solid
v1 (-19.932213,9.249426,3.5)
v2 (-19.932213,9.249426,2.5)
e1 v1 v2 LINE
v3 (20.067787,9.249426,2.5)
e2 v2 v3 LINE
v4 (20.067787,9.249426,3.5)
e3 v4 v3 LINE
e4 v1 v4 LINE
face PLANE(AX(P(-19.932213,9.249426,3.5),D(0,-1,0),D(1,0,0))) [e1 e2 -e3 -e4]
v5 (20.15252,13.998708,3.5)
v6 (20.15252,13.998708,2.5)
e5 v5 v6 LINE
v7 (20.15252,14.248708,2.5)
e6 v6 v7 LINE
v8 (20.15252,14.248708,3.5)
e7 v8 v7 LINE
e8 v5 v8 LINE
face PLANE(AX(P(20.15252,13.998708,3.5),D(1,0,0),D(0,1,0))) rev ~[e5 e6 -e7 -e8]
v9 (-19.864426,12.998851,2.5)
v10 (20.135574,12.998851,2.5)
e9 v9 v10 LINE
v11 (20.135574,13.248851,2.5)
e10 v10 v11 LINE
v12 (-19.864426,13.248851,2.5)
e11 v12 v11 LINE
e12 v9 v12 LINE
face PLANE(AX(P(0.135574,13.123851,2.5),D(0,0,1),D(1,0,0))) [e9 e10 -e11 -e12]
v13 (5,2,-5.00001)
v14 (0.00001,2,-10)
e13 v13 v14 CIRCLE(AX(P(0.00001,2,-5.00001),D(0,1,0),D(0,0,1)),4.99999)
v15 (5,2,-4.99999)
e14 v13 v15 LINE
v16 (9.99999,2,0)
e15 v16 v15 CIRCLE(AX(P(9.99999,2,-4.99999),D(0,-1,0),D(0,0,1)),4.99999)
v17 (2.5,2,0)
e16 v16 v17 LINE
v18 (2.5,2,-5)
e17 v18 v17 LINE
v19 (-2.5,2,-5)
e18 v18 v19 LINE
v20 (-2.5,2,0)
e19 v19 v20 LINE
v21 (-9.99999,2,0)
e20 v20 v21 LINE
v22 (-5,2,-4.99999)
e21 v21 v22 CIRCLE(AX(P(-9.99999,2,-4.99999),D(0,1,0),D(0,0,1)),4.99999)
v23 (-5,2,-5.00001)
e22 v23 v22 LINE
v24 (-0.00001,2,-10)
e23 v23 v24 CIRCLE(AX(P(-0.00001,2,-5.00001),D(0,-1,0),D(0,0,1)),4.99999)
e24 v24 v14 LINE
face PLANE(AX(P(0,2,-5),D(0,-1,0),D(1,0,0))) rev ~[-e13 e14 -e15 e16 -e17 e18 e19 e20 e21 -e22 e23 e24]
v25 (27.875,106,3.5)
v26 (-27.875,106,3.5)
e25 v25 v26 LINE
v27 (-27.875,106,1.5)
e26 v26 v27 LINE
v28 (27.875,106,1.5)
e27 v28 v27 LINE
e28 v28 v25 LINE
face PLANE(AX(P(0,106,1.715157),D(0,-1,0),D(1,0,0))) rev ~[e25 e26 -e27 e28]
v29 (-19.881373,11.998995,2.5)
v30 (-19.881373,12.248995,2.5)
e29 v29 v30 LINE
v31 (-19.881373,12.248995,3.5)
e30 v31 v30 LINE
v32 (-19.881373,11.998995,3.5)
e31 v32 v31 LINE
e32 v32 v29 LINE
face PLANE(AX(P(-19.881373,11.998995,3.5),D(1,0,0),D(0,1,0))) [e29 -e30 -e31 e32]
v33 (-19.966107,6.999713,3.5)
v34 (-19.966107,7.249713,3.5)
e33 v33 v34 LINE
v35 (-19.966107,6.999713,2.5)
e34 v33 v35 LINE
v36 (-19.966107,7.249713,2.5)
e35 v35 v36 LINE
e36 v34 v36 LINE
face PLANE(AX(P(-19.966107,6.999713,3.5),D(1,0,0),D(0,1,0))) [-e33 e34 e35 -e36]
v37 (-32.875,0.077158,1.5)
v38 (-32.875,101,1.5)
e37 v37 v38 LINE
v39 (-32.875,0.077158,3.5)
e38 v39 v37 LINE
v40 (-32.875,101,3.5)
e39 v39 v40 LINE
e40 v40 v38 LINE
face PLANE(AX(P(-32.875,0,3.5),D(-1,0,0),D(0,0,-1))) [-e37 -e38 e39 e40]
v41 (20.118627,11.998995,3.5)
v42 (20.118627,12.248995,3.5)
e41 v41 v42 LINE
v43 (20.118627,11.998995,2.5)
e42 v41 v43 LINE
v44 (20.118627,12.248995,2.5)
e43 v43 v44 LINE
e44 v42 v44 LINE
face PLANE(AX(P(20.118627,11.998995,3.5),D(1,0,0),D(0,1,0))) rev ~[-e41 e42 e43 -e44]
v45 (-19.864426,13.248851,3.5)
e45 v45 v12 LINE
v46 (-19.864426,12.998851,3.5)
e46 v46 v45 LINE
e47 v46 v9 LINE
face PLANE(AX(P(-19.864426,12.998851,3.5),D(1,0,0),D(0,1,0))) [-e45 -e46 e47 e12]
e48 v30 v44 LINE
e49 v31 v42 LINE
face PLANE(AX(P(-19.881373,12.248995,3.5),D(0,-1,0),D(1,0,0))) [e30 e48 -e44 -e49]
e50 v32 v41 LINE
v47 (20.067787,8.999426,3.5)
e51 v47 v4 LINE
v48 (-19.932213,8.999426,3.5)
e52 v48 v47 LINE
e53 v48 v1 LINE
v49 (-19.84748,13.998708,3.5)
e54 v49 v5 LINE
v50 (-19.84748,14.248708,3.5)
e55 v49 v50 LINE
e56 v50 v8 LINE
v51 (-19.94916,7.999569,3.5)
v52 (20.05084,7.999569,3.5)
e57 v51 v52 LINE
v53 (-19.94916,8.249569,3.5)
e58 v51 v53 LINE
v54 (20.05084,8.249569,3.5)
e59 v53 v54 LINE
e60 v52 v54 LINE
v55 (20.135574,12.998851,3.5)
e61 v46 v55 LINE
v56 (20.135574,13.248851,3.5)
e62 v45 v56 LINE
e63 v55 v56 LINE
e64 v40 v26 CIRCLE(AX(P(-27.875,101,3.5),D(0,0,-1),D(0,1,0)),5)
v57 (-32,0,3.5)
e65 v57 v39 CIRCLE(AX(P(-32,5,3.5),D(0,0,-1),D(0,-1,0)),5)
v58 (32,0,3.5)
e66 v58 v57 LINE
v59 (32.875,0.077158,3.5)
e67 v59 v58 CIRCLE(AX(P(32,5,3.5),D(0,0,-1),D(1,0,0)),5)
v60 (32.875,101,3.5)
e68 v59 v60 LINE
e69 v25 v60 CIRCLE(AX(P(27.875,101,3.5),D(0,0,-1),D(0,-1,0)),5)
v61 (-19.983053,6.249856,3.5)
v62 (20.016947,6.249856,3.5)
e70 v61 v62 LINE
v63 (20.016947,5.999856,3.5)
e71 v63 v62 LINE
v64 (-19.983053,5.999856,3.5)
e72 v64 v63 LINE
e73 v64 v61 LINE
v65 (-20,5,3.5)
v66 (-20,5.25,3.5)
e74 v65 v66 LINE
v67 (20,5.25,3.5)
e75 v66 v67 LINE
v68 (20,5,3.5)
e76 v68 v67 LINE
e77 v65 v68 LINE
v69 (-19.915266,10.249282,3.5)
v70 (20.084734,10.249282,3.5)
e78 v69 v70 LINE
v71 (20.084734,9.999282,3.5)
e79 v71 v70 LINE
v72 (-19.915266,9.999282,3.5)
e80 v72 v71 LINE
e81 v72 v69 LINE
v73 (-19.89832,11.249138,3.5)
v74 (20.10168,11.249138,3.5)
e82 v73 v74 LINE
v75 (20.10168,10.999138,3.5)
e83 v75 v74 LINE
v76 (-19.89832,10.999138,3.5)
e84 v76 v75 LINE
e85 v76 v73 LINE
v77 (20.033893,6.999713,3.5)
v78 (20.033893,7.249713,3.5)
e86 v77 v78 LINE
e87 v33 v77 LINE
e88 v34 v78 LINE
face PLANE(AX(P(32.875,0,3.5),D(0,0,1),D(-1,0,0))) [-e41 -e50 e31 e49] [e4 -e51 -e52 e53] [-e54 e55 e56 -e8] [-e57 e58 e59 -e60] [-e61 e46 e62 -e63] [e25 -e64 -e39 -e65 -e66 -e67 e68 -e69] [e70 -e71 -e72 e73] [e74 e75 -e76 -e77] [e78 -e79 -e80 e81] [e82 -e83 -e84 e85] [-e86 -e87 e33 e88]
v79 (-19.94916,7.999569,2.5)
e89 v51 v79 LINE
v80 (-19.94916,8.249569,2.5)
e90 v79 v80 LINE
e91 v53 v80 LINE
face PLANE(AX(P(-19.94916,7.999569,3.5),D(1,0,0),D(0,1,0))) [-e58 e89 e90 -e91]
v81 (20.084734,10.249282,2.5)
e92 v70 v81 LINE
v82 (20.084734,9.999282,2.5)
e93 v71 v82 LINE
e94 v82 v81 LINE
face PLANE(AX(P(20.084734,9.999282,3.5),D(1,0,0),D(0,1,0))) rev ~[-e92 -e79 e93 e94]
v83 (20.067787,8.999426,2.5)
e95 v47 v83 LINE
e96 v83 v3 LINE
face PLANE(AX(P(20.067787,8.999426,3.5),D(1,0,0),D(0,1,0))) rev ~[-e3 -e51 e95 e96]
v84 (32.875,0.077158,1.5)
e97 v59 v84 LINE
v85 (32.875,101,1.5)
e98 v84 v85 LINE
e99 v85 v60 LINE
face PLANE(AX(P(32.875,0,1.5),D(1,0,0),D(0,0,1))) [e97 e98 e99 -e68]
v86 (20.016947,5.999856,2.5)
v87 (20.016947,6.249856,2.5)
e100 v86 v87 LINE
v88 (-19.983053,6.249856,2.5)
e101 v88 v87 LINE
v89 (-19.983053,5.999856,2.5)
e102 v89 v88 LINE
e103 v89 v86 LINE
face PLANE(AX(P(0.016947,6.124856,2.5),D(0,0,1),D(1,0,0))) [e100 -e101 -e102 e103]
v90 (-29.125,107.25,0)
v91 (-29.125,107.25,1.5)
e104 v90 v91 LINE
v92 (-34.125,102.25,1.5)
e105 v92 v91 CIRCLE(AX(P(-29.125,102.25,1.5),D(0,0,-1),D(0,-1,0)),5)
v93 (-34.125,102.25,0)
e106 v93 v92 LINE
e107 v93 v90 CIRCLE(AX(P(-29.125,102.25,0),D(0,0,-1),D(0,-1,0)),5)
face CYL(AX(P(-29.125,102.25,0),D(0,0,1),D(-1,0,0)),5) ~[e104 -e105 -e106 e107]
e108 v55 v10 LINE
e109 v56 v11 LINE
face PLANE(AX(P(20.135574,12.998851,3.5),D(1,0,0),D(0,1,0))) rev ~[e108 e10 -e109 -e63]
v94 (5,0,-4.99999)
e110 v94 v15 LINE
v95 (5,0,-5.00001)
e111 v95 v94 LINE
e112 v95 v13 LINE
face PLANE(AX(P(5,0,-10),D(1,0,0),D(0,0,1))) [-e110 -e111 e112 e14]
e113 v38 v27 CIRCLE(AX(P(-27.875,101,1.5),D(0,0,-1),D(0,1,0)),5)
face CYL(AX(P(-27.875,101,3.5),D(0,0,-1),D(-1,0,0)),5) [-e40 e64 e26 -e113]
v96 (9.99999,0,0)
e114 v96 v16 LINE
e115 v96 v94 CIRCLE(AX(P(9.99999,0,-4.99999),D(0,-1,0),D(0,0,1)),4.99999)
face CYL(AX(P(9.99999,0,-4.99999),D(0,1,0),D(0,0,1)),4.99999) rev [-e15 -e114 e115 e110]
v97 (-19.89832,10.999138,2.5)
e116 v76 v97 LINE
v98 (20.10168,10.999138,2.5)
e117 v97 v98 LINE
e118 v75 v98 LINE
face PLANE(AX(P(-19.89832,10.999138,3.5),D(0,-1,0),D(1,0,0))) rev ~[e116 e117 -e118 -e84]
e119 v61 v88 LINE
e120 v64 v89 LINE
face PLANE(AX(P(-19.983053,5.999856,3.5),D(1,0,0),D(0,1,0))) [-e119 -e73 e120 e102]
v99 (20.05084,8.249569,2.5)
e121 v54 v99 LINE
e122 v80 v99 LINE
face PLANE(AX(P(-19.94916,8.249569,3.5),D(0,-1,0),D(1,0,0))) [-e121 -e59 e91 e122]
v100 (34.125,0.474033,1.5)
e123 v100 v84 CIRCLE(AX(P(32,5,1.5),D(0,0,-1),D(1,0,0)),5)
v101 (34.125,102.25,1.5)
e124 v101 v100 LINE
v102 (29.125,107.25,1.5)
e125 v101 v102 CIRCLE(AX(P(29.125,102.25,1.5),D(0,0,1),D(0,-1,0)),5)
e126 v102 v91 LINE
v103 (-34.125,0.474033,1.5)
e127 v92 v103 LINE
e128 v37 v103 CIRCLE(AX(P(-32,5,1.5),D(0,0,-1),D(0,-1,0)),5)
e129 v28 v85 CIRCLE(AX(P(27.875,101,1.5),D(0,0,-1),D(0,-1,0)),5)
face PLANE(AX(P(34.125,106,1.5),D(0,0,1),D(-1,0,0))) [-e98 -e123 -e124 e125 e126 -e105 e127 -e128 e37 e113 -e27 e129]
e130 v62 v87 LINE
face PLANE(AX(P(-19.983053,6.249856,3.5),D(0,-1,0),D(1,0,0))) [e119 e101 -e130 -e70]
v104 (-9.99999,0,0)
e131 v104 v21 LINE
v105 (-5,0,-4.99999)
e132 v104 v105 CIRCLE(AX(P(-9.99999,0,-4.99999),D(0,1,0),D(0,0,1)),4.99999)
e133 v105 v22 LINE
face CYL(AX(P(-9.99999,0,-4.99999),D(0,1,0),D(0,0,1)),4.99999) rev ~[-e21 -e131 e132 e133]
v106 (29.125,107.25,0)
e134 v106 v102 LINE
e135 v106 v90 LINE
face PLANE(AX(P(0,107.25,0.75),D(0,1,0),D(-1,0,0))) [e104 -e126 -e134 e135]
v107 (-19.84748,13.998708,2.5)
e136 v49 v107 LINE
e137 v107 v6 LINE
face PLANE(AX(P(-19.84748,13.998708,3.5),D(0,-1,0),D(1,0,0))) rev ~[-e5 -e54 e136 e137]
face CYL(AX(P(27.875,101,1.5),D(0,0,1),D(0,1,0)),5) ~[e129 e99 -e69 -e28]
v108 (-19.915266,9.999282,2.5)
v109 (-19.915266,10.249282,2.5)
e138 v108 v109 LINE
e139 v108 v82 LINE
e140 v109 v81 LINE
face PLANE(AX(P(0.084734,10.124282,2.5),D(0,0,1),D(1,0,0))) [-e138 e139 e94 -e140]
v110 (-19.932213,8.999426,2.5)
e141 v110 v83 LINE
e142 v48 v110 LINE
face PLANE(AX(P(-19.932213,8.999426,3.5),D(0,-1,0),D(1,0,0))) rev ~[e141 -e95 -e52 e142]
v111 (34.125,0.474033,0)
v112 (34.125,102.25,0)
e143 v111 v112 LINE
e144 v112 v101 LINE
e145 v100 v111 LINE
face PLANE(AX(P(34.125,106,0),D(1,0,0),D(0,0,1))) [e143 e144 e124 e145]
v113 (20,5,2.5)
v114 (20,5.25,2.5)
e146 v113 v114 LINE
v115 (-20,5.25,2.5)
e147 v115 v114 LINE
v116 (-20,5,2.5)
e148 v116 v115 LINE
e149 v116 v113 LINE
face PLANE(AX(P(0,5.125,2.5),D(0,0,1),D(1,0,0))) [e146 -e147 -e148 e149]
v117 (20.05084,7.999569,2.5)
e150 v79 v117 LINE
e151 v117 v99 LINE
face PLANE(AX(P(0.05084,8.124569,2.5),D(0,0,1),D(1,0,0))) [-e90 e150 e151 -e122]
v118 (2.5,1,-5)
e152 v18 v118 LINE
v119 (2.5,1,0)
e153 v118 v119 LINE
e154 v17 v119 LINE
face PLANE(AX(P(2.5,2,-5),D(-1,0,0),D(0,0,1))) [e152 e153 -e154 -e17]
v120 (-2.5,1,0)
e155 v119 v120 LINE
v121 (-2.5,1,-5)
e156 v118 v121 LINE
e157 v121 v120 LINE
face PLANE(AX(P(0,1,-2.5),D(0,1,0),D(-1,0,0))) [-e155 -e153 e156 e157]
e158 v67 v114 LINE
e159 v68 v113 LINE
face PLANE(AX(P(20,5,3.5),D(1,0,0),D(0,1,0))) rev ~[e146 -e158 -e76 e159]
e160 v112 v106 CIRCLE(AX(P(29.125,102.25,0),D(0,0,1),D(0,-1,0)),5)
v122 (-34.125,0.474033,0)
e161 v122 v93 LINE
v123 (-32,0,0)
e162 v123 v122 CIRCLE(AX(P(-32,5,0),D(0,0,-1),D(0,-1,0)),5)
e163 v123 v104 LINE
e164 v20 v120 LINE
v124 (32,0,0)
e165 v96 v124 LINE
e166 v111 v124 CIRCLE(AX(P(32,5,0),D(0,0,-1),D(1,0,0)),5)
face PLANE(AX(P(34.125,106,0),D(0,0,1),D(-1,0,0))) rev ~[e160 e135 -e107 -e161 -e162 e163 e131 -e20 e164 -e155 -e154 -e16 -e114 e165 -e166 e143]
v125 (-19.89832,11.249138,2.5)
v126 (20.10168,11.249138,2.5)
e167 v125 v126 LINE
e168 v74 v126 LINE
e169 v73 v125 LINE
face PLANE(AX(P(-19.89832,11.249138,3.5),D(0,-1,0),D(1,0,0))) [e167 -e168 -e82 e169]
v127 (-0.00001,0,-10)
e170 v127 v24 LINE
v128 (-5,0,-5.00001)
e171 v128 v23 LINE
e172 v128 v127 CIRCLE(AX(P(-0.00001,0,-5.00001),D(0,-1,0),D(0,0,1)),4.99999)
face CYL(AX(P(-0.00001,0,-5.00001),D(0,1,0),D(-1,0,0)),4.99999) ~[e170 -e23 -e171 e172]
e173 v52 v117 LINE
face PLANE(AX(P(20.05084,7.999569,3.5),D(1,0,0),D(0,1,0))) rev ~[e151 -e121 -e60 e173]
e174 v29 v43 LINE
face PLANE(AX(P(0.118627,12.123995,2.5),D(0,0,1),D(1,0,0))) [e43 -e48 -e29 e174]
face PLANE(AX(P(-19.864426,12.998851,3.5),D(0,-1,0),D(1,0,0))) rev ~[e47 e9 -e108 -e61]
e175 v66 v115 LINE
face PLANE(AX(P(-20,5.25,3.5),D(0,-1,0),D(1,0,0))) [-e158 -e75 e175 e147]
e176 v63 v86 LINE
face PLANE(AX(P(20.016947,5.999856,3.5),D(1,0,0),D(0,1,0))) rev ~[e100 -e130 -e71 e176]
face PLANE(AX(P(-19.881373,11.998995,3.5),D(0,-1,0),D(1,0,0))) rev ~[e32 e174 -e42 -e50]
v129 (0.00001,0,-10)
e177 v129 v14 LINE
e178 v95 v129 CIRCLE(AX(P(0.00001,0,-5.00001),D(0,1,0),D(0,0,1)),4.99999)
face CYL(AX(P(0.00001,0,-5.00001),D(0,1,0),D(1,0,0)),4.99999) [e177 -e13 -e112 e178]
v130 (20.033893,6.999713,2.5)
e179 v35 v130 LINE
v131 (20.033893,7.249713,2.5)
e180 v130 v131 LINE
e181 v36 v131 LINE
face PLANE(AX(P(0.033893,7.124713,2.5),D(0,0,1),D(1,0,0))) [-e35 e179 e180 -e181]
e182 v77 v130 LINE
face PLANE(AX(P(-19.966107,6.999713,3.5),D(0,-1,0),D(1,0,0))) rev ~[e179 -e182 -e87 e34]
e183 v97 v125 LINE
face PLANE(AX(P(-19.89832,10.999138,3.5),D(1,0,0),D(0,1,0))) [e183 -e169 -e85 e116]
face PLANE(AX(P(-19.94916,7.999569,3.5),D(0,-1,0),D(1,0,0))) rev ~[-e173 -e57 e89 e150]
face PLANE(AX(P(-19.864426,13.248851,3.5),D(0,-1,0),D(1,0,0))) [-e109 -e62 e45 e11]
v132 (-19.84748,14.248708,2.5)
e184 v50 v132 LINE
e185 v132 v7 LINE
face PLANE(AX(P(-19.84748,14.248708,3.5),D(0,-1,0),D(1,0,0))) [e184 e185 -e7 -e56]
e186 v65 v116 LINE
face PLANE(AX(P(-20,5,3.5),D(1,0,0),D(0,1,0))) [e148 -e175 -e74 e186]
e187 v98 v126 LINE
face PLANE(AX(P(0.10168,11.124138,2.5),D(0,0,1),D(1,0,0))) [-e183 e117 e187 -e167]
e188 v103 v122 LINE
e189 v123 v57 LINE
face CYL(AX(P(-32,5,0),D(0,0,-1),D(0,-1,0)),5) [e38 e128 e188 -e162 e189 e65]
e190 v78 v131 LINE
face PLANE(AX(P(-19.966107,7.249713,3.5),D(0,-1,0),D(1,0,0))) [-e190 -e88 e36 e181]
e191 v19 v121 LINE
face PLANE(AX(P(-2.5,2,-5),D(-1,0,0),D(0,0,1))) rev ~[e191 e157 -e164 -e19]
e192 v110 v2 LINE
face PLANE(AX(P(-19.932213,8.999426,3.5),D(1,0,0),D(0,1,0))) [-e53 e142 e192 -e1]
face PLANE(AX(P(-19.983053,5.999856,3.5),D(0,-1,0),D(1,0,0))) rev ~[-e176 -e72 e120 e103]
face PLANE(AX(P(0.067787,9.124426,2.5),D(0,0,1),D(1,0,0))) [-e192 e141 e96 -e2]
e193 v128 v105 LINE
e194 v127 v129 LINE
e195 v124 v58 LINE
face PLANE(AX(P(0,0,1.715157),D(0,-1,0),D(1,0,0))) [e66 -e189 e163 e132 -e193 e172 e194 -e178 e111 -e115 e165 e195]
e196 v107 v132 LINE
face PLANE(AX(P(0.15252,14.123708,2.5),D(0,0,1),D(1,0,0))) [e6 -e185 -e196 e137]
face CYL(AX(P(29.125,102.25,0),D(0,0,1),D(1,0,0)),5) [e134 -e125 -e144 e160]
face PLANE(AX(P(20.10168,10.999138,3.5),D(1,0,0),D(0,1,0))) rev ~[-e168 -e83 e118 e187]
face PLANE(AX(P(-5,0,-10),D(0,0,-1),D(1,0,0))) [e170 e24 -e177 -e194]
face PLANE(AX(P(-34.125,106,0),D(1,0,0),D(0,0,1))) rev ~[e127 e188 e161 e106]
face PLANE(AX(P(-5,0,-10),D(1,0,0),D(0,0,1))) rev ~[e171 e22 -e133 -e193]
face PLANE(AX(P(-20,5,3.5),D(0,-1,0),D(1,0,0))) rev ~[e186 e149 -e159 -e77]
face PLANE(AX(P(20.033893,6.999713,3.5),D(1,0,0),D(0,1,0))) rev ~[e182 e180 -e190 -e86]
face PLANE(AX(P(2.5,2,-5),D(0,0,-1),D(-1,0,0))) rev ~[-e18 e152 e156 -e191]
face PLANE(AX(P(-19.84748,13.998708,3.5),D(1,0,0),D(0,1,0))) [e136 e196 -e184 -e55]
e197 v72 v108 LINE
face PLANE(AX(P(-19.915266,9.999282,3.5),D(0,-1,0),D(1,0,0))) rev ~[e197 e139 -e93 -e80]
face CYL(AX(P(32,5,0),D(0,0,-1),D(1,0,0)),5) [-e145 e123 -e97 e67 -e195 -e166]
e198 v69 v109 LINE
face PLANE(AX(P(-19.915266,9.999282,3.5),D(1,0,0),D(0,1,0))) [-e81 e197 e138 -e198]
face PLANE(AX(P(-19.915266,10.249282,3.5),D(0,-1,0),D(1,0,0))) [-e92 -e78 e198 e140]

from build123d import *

# Parameters (mm, degrees)
F1_DEPTH  = 106
F2_W      = 68.25
F2_H      = 1.5
F3_DEPTH  = 1.25
F4_R      = 5
F6_DEPTH  = 25
F7_W      = 10
F7_H      = 10
F8_DEPTH  = 2
F9_R      = 4.99999
F10_W     = 5
F10_H     = 5
F11_DEPTH = 1
F12_W     = 40
F12_H     = 0.25
F13_DEPTH = 1


# Not quite as in the source:
# - a fillet or chamfer is up to 0.001 mm smaller than in the source, because OpenCascade refuses the exact size


with BuildPart() as f1:
    # F0 (on Front) → F1 (new body)
    with BuildSketch(Plane.XZ):
        Polygon((32.875, 1.5), (32.875, 3.5), (-32.875, 3.5), (-32.875, 1.5), (-34.125, 1.5), (-34.125, 0), (34.125, 0), (34.125, 1.5), align=None)
    extrude(amount=-F1_DEPTH)

    # F2 (on face) → F3 (join)
    with BuildSketch(Plane(origin=(0, 106, 0), x_dir=(-1, 0, 0), z_dir=(0, 1, 0))):
        with Locations((0, 0.75)):
            Rectangle(F2_W, F2_H)
    extrude(amount=F3_DEPTH)

    # F4
    f4_edges = [f1.edges().sort_by_distance(p)[0] for p in [
        (34.125, 107.25, 0.75),
        (-34.125, 107.25, 0.75),
        (-32.875, 106, 2.5),
        (32.875, 106, 2.5),
    ]]
    fillet(f4_edges, radius=F4_R)

    # F5 (on Top) → F6 (cut)
    with BuildSketch(Plane.XY):
        with BuildLine():
            ThreePointArc((-32, 0), (-35.5355339059, 1.4644660941), (-37, 5))
            Line((-37, 5), (-47.4459486902, 5.1317643374))
            Line((-47.4459486902, 5.1317643374), (-32.4784885049, -8.2395952195))
            Line((-32.4784885049, -8.2395952195), (-32, 0))
        make_face()
        with BuildLine():
            Line((47.8749121428, 4.8458835855), (37, 4.9999998882))
            ThreePointArc((37, 4.9999998882), (35.5355339059, 1.4644659823), (32, -1.118e-07))
            Line((32, -1.118e-07), (31.699370116, -9.054190591))
            Line((31.699370116, -9.054190591), (47.8749121428, 4.8458835855))
        make_face()
    extrude(amount=F6_DEPTH, mode=Mode.SUBTRACT)

    # F7 (on face) → F8 (join)
    with BuildSketch(Plane.XZ):
        with Locations((0, -5)):
            Rectangle(F7_W, F7_H)
    extrude(amount=-F8_DEPTH)

    # F9 (radius 5 in the source; OpenCascade refuses exactly that, so slightly less here)
    f9_edges = [f1.edges().sort_by_distance(p)[0] for p in [
        (5, 1, 0),
        (-5, 1, 0),
        (-5, 1, -10),
        (5, 1, -10),
    ]]
    fillet(f9_edges, radius=F9_R)

    # F10 (on face) → F11 (cut)
    with BuildSketch(Plane(origin=(0, 2, 0), x_dir=(-1, 0, 0), z_dir=(0, 1, 0))):
        with Locations((0, -2.5)):
            Rectangle(F10_W, F10_H)
    extrude(amount=-F11_DEPTH, mode=Mode.SUBTRACT)

    # F12 (on face) → F13 (cut)
    with BuildSketch(Plane.XY.offset(3.5)):
        with Locations((0, 5.125)):
            Rectangle(F12_W, F12_H)
        with Locations((0.0169467185, 6.1248563941)):
            Rectangle(F12_W, F12_H)
        with Locations((0.0338934371, 7.1247127881)):
            Rectangle(F12_W, F12_H)
        with Locations((0.0508401556, 8.1245691822)):
            Rectangle(F12_W, F12_H)
        with Locations((0.0677868742, 9.1244255762)):
            Rectangle(F12_W, F12_H)
        with Locations((0.0847335927, 10.1242819703)):
            Rectangle(F12_W, F12_H)
        with Locations((0.1016803113, 11.1241383643)):
            Rectangle(F12_W, F12_H)
        with Locations((0.1186270298, 12.1239947584)):
            Rectangle(F12_W, F12_H)
        with Locations((0.1355737483, 13.1238511524)):
            Rectangle(F12_W, F12_H)
        with Locations((0.1525204669, 14.1237075465)):
            Rectangle(F12_W, F12_H)
    extrude(amount=-F13_DEPTH, mode=Mode.SUBTRACT)


solid = f1.part
